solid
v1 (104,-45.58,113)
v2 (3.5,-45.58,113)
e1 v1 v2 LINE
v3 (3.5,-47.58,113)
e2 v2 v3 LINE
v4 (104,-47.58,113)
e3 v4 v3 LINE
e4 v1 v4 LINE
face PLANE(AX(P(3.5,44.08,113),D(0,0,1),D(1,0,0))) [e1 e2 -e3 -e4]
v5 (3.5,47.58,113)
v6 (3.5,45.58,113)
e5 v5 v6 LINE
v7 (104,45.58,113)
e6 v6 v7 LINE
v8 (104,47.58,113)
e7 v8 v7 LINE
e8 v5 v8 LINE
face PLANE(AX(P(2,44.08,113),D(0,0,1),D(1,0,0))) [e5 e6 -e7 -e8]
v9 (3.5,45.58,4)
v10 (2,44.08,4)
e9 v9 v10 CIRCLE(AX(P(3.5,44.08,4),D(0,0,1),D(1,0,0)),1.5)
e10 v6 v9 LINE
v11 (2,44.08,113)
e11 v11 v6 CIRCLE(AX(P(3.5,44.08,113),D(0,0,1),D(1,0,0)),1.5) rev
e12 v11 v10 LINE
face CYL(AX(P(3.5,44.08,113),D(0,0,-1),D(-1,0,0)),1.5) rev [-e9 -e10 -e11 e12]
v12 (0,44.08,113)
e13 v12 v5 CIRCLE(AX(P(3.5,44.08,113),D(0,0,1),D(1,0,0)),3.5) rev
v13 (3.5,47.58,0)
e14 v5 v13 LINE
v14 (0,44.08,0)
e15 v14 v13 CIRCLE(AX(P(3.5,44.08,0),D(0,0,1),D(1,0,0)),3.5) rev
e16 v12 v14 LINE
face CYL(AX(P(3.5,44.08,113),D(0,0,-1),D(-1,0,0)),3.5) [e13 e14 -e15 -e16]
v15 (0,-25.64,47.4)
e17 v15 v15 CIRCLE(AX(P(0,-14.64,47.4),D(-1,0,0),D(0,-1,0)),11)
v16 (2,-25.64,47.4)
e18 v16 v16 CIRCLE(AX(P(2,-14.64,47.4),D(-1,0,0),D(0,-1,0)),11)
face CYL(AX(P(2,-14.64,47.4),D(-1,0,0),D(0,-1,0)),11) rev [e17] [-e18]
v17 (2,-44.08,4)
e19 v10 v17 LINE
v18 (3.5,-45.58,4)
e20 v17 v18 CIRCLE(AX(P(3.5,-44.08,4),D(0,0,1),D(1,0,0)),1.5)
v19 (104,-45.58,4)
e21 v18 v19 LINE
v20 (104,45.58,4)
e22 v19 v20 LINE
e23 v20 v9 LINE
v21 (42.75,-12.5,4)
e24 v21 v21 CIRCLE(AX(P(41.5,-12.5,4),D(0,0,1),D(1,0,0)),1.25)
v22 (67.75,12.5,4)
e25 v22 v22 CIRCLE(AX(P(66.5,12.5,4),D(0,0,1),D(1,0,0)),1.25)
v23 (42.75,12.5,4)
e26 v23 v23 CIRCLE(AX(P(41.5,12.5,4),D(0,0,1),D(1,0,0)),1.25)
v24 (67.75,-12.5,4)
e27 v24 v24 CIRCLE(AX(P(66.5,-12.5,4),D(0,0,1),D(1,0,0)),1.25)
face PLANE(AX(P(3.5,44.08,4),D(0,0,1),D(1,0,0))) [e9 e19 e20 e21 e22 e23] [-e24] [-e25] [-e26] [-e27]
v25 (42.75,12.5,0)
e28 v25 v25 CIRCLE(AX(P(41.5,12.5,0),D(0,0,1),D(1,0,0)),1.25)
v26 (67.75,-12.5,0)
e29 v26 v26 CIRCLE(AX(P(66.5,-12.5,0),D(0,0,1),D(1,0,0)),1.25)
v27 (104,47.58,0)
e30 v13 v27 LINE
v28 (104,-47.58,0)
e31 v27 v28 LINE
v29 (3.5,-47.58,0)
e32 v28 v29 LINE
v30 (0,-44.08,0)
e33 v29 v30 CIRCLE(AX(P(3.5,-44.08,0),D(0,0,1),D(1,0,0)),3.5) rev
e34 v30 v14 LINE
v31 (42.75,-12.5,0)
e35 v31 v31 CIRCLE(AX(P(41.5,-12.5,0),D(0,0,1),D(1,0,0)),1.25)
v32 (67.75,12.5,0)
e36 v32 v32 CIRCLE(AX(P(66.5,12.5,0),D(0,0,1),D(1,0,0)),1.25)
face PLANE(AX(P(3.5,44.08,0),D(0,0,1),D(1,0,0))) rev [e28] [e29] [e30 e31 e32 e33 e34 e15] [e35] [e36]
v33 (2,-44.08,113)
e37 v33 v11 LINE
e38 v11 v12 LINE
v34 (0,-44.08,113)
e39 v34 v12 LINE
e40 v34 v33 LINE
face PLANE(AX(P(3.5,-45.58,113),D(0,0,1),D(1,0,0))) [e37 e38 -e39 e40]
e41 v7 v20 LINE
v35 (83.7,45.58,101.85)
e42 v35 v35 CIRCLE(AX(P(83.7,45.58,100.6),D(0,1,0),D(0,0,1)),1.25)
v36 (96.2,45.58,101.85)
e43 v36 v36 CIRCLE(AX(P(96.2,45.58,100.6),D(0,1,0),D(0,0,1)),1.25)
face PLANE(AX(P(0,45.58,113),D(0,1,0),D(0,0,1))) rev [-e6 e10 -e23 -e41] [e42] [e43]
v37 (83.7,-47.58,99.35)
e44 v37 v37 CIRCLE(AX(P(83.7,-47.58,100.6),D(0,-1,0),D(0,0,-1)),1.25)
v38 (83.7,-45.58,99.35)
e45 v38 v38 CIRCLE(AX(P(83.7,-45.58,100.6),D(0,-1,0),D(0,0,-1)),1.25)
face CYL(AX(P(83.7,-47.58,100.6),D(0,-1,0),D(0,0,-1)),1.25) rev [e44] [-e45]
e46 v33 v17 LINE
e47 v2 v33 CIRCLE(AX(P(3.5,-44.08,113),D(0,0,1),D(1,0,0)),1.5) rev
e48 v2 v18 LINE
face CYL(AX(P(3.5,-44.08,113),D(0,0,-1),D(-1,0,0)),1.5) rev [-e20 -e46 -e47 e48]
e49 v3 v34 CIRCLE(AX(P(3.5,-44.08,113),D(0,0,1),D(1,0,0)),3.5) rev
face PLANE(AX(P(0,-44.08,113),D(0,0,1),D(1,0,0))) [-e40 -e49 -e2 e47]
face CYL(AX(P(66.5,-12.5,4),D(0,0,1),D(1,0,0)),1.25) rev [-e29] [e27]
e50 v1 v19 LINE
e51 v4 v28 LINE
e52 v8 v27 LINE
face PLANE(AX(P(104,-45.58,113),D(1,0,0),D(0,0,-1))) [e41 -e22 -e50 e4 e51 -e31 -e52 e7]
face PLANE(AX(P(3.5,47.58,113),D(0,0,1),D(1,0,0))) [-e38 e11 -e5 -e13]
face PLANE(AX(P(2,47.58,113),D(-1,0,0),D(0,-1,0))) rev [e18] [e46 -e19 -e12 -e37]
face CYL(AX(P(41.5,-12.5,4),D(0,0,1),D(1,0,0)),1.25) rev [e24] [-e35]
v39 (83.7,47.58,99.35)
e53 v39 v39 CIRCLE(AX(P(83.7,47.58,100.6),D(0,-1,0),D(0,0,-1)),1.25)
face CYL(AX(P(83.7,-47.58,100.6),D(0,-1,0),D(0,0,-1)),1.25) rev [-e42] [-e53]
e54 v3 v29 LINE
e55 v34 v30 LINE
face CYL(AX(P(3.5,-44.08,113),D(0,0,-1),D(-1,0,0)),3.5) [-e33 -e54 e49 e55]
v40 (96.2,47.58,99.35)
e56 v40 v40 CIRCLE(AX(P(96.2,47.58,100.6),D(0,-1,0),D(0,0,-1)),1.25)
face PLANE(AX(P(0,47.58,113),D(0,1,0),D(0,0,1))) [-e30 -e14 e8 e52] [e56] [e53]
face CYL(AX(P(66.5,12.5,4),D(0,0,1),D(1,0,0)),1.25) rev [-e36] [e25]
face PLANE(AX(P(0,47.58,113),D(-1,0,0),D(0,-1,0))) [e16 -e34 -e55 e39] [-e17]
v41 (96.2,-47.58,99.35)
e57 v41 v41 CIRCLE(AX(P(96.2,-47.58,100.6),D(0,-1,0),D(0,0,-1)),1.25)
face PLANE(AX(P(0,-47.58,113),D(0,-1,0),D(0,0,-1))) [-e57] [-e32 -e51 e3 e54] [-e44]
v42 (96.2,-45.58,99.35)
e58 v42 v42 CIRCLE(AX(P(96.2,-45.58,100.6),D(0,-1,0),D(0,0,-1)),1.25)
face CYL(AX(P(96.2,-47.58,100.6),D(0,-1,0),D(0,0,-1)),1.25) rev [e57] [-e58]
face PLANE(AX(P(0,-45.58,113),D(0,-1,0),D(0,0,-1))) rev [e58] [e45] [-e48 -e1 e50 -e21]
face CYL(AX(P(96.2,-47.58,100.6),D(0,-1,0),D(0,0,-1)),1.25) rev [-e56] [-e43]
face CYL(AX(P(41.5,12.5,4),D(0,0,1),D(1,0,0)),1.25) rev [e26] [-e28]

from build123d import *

# Parameters (mm, degrees)
SM_BASE_FLANGE_1_DEPTH = 113
EXTRUDE_1_DEPTH        = 4
HOLE_WIZARD_M3_1_D     = 2.5
SKETCH_10_R            = 11
CUT_EXTRUDE_1_DEPTH    = 2
HOLE_WIZARD_M3_2_D     = 2.5


# Sheet-metal steps are written as plain solids
with BuildPart() as part:
    # Sketch 1 → 基体-法兰1 (new body)
    with BuildSketch(Plane.XY):
        with BuildLine():
            Line((104, 47.58), (3.5, 47.58))
            ThreePointArc((3.5, 47.58), (1.025126266, 46.554873734), (0, 44.08))
            Line((0, 44.08), (0, -44.08))
            ThreePointArc((0, -44.08), (1.025126266, -46.554873734), (3.5, -47.58))
            Line((3.5, -47.58), (104, -47.58))
            Line((104, -47.58), (104, -45.58))
            Line((104, -45.58), (3.5, -45.58))
            ThreePointArc((3.5, -45.58), (2.439339828, -45.140660172), (2, -44.08))
            Line((2, -44.08), (2, 44.08))
            ThreePointArc((2, 44.08), (2.439339828, 45.140660172), (3.5, 45.58))
            Line((3.5, 45.58), (104, 45.58))
            Line((104, 45.58), (104, 47.58))
        make_face()
    extrude(amount=SM_BASE_FLANGE_1_DEPTH)

    # 草图6 → 凸台-拉伸1 (add)
    with BuildSketch(Plane.XY):
        with BuildLine():
            Line((104, 45.58), (3.5, 45.58))
            ThreePointArc((3.5, 45.58), (2.439339828, 45.140660172), (2, 44.08))
            Line((2, 44.08), (2, -44.08))
            ThreePointArc((2, -44.08), (2.439339828, -45.140660172), (3.5, -45.58))
            Line((3.5, -45.58), (104, -45.58))
            Line((104, -45.58), (104, 45.58))
        make_face()
    extrude(amount=EXTRUDE_1_DEPTH)

    # M3 螺纹孔1 (through all)
    with Locations(Plane(origin=(0, -47.58, 0), x_dir=(-1, 0, 0), z_dir=(0, -1, 0))):
        with Locations((-83.7, -100.6), (-96.2, -100.6)):
            Hole(HOLE_WIZARD_M3_1_D / 2)

    # 草图10 → 切除-拉伸1 (cut)
    with BuildSketch(Plane.ZY):
        with Locations(Location((47.4, -14.64, 0), (0, 0, 270))):
            Circle(SKETCH_10_R)
    extrude(amount=-CUT_EXTRUDE_1_DEPTH, mode=Mode.SUBTRACT)

    # M3 螺纹孔2 (through all)
    with Locations(Plane.XY.offset(4)):
        with Locations((41.5, 12.5), (66.5, 12.5), (66.5, -12.5), (41.5, -12.5)):
            Hole(HOLE_WIZARD_M3_2_D / 2)


solid = part.part
